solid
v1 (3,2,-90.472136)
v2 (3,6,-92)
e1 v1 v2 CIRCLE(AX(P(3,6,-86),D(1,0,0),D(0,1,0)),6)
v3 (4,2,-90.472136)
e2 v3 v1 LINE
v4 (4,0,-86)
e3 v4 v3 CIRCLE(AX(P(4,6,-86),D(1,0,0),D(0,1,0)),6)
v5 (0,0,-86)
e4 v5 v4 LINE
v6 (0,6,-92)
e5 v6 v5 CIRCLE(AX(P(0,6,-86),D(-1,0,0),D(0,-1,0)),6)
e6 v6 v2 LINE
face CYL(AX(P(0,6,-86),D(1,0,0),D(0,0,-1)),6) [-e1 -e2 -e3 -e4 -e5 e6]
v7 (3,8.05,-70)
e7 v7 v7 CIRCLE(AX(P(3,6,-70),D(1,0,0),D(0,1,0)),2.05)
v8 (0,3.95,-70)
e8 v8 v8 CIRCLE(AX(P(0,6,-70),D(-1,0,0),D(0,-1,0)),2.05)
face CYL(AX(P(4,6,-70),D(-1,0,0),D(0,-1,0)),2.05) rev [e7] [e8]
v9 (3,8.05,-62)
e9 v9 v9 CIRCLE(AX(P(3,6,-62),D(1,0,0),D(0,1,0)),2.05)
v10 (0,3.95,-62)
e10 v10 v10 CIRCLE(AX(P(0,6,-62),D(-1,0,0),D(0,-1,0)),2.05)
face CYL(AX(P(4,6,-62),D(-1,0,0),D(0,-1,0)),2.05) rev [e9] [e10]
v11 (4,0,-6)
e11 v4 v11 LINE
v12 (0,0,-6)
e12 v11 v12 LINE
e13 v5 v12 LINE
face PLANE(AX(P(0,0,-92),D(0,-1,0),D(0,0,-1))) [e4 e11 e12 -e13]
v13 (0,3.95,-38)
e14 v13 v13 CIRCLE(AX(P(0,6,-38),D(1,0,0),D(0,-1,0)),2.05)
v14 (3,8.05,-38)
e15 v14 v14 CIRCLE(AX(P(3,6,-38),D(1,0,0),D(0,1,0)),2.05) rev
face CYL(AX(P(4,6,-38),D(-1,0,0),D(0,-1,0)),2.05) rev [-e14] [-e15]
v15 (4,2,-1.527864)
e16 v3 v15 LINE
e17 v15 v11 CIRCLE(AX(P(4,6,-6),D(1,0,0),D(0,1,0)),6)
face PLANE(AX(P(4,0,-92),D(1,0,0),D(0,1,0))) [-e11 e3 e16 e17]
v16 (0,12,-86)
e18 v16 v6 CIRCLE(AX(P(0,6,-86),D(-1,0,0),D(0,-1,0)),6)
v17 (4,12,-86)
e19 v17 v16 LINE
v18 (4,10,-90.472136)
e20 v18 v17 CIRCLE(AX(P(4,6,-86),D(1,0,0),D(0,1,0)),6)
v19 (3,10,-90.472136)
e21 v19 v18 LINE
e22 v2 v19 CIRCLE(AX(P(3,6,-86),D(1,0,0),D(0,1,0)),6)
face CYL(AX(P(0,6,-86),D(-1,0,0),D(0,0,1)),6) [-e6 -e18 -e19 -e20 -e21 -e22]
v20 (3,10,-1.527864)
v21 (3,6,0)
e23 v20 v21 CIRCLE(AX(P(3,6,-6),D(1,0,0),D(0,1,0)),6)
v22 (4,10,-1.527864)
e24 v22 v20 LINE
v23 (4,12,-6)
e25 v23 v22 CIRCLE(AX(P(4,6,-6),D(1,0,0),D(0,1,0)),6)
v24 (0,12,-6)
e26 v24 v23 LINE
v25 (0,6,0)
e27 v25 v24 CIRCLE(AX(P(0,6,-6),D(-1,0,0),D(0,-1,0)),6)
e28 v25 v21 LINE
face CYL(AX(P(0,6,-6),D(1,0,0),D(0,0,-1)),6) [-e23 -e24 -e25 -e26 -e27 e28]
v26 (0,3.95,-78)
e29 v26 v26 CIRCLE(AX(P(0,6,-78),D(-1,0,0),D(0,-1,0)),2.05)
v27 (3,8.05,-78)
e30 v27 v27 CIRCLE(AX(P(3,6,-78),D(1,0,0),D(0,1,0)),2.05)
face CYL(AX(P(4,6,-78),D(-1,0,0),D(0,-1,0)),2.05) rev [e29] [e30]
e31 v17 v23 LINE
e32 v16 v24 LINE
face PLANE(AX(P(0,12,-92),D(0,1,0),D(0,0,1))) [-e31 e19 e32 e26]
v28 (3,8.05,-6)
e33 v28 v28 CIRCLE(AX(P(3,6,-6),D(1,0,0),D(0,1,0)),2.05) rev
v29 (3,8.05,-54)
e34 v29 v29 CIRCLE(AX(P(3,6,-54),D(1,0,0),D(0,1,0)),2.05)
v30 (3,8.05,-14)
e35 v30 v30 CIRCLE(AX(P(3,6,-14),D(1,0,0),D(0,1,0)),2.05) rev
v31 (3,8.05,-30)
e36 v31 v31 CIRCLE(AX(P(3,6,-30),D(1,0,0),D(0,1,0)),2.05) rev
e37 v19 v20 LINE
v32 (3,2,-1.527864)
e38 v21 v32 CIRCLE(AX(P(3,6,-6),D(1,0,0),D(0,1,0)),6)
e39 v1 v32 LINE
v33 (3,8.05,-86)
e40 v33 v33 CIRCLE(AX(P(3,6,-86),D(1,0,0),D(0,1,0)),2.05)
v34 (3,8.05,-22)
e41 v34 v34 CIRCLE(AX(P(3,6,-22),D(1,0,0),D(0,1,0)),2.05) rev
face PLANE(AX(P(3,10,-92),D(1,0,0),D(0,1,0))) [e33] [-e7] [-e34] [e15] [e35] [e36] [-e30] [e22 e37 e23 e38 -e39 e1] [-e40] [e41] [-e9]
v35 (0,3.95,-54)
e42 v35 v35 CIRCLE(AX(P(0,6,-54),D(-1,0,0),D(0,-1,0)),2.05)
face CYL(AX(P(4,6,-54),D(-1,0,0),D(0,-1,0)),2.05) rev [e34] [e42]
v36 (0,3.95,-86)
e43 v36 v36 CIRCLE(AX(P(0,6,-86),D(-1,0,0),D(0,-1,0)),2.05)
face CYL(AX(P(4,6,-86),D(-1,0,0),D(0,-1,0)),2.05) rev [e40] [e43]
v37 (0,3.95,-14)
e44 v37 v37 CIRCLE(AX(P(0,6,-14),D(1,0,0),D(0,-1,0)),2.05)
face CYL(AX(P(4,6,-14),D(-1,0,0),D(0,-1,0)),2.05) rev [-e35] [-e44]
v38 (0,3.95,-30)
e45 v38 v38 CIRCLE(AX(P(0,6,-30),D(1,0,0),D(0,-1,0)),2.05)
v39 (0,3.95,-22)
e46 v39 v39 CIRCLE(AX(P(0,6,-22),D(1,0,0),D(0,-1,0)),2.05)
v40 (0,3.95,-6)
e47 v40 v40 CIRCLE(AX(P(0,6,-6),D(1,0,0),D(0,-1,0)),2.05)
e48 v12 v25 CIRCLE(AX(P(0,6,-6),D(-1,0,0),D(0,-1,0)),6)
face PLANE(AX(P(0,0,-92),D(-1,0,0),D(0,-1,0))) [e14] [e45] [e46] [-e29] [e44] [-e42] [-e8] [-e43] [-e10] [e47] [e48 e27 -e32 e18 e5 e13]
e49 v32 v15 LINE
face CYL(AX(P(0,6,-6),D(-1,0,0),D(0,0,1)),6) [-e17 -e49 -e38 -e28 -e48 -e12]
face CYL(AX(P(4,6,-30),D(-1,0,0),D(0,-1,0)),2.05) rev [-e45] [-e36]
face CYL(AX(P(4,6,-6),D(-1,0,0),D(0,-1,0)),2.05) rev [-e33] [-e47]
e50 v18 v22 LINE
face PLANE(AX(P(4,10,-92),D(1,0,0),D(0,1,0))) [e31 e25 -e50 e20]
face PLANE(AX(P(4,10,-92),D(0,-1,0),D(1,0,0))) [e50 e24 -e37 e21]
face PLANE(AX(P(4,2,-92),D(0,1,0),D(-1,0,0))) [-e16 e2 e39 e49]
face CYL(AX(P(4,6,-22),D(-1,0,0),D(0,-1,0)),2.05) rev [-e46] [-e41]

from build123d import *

# Parameters (mm, degrees)
BOSS_EXTRUDE1_DEPTH     = 92
FILLET1_R               = 6
SKETCH2_R               = 2.05
CUT_EXTRUDE1_DEPTH      = 93.86549413
LPATTERN1_COUNT         = 5
LPATTERN1_PITCH         = 8
MIRROR1_COPY_1_SKETCH_R = 2.05
MIRROR1_COPY_1_DEPTH    = 93.86549413
MIRROR1_COPY_2_SKETCH_R = 2.05
MIRROR1_COPY_2_DEPTH    = 93.86549413
MIRROR1_COPY_3_SKETCH_R = 2.05
MIRROR1_COPY_3_DEPTH    = 93.86549413
MIRROR1_COPY_4_SKETCH_R = 2.05
MIRROR1_COPY_4_DEPTH    = 93.86549413


with BuildPart() as part:
    # Sketch1 → Boss-Extrude1 (new body)
    with BuildSketch(Plane.XY):
        Polygon((0, 0), (4, 0), (4, 2), (3, 2), (3, 10), (4, 10), (4, 12), (0, 12), align=None)
    extrude(amount=-BOSS_EXTRUDE1_DEPTH)

    # Fillet1
    fillet1_edges = [part.edges().sort_by_distance(p)[0] for p in [
        (2, 12, 0),
        (2, 0, 0),
        (2, 0, -92),
        (2, 12, -92),
    ]]
    fillet(fillet1_edges, radius=FILLET1_R - 0.0001)  # a hair under: the kernel refuses the full size

    # Sketch2 → Cut-Extrude1 (cut, through all)
    with BuildSketch(Plane.ZY):
        with Locations(Location((-86, 6, 0), (0, 0, 270))):
            Circle(SKETCH2_R)
    cut_extrude1 = extrude(amount=-CUT_EXTRUDE1_DEPTH, mode=Mode.SUBTRACT)

    # LPattern1: Cut-Extrude1 ×5
    with Locations(*[(0, 0, i * LPATTERN1_PITCH) for i in range(1, LPATTERN1_COUNT)]):
        add(cut_extrude1, mode=Mode.SUBTRACT)

    # Mirror1: Cut-Extrude1 across plane
    add(cut_extrude1.mirror(Plane.XY.offset(-46)), mode=Mode.SUBTRACT)

    # Mirror1 copy 1 sketch → Mirror1 copy 1 (cut, through all)
    with BuildSketch(Plane(origin=(0, 0, -100), x_dir=(0, 0, -1), z_dir=(-1, 0, 0))):
        with Locations((-86, -6)):
            Circle(MIRROR1_COPY_1_SKETCH_R)
    extrude(amount=-MIRROR1_COPY_1_DEPTH, mode=Mode.SUBTRACT)

    # Mirror1 copy 2 sketch → Mirror1 copy 2 (cut, through all)
    with BuildSketch(Plane(origin=(0, 0, -108), x_dir=(0, 0, -1), z_dir=(-1, 0, 0))):
        with Locations((-86, -6)):
            Circle(MIRROR1_COPY_2_SKETCH_R)
    extrude(amount=-MIRROR1_COPY_2_DEPTH, mode=Mode.SUBTRACT)

    # Mirror1 copy 3 sketch → Mirror1 copy 3 (cut, through all)
    with BuildSketch(Plane(origin=(0, 0, -116), x_dir=(0, 0, -1), z_dir=(-1, 0, 0))):
        with Locations((-86, -6)):
            Circle(MIRROR1_COPY_3_SKETCH_R)
    extrude(amount=-MIRROR1_COPY_3_DEPTH, mode=Mode.SUBTRACT)

    # Mirror1 copy 4 sketch → Mirror1 copy 4 (cut, through all)
    with BuildSketch(Plane(origin=(0, 0, -124), x_dir=(0, 0, -1), z_dir=(-1, 0, 0))):
        with Locations((-86, -6)):
            Circle(MIRROR1_COPY_4_SKETCH_R)
    extrude(amount=-MIRROR1_COPY_4_DEPTH, mode=Mode.SUBTRACT)


solid = part.part
